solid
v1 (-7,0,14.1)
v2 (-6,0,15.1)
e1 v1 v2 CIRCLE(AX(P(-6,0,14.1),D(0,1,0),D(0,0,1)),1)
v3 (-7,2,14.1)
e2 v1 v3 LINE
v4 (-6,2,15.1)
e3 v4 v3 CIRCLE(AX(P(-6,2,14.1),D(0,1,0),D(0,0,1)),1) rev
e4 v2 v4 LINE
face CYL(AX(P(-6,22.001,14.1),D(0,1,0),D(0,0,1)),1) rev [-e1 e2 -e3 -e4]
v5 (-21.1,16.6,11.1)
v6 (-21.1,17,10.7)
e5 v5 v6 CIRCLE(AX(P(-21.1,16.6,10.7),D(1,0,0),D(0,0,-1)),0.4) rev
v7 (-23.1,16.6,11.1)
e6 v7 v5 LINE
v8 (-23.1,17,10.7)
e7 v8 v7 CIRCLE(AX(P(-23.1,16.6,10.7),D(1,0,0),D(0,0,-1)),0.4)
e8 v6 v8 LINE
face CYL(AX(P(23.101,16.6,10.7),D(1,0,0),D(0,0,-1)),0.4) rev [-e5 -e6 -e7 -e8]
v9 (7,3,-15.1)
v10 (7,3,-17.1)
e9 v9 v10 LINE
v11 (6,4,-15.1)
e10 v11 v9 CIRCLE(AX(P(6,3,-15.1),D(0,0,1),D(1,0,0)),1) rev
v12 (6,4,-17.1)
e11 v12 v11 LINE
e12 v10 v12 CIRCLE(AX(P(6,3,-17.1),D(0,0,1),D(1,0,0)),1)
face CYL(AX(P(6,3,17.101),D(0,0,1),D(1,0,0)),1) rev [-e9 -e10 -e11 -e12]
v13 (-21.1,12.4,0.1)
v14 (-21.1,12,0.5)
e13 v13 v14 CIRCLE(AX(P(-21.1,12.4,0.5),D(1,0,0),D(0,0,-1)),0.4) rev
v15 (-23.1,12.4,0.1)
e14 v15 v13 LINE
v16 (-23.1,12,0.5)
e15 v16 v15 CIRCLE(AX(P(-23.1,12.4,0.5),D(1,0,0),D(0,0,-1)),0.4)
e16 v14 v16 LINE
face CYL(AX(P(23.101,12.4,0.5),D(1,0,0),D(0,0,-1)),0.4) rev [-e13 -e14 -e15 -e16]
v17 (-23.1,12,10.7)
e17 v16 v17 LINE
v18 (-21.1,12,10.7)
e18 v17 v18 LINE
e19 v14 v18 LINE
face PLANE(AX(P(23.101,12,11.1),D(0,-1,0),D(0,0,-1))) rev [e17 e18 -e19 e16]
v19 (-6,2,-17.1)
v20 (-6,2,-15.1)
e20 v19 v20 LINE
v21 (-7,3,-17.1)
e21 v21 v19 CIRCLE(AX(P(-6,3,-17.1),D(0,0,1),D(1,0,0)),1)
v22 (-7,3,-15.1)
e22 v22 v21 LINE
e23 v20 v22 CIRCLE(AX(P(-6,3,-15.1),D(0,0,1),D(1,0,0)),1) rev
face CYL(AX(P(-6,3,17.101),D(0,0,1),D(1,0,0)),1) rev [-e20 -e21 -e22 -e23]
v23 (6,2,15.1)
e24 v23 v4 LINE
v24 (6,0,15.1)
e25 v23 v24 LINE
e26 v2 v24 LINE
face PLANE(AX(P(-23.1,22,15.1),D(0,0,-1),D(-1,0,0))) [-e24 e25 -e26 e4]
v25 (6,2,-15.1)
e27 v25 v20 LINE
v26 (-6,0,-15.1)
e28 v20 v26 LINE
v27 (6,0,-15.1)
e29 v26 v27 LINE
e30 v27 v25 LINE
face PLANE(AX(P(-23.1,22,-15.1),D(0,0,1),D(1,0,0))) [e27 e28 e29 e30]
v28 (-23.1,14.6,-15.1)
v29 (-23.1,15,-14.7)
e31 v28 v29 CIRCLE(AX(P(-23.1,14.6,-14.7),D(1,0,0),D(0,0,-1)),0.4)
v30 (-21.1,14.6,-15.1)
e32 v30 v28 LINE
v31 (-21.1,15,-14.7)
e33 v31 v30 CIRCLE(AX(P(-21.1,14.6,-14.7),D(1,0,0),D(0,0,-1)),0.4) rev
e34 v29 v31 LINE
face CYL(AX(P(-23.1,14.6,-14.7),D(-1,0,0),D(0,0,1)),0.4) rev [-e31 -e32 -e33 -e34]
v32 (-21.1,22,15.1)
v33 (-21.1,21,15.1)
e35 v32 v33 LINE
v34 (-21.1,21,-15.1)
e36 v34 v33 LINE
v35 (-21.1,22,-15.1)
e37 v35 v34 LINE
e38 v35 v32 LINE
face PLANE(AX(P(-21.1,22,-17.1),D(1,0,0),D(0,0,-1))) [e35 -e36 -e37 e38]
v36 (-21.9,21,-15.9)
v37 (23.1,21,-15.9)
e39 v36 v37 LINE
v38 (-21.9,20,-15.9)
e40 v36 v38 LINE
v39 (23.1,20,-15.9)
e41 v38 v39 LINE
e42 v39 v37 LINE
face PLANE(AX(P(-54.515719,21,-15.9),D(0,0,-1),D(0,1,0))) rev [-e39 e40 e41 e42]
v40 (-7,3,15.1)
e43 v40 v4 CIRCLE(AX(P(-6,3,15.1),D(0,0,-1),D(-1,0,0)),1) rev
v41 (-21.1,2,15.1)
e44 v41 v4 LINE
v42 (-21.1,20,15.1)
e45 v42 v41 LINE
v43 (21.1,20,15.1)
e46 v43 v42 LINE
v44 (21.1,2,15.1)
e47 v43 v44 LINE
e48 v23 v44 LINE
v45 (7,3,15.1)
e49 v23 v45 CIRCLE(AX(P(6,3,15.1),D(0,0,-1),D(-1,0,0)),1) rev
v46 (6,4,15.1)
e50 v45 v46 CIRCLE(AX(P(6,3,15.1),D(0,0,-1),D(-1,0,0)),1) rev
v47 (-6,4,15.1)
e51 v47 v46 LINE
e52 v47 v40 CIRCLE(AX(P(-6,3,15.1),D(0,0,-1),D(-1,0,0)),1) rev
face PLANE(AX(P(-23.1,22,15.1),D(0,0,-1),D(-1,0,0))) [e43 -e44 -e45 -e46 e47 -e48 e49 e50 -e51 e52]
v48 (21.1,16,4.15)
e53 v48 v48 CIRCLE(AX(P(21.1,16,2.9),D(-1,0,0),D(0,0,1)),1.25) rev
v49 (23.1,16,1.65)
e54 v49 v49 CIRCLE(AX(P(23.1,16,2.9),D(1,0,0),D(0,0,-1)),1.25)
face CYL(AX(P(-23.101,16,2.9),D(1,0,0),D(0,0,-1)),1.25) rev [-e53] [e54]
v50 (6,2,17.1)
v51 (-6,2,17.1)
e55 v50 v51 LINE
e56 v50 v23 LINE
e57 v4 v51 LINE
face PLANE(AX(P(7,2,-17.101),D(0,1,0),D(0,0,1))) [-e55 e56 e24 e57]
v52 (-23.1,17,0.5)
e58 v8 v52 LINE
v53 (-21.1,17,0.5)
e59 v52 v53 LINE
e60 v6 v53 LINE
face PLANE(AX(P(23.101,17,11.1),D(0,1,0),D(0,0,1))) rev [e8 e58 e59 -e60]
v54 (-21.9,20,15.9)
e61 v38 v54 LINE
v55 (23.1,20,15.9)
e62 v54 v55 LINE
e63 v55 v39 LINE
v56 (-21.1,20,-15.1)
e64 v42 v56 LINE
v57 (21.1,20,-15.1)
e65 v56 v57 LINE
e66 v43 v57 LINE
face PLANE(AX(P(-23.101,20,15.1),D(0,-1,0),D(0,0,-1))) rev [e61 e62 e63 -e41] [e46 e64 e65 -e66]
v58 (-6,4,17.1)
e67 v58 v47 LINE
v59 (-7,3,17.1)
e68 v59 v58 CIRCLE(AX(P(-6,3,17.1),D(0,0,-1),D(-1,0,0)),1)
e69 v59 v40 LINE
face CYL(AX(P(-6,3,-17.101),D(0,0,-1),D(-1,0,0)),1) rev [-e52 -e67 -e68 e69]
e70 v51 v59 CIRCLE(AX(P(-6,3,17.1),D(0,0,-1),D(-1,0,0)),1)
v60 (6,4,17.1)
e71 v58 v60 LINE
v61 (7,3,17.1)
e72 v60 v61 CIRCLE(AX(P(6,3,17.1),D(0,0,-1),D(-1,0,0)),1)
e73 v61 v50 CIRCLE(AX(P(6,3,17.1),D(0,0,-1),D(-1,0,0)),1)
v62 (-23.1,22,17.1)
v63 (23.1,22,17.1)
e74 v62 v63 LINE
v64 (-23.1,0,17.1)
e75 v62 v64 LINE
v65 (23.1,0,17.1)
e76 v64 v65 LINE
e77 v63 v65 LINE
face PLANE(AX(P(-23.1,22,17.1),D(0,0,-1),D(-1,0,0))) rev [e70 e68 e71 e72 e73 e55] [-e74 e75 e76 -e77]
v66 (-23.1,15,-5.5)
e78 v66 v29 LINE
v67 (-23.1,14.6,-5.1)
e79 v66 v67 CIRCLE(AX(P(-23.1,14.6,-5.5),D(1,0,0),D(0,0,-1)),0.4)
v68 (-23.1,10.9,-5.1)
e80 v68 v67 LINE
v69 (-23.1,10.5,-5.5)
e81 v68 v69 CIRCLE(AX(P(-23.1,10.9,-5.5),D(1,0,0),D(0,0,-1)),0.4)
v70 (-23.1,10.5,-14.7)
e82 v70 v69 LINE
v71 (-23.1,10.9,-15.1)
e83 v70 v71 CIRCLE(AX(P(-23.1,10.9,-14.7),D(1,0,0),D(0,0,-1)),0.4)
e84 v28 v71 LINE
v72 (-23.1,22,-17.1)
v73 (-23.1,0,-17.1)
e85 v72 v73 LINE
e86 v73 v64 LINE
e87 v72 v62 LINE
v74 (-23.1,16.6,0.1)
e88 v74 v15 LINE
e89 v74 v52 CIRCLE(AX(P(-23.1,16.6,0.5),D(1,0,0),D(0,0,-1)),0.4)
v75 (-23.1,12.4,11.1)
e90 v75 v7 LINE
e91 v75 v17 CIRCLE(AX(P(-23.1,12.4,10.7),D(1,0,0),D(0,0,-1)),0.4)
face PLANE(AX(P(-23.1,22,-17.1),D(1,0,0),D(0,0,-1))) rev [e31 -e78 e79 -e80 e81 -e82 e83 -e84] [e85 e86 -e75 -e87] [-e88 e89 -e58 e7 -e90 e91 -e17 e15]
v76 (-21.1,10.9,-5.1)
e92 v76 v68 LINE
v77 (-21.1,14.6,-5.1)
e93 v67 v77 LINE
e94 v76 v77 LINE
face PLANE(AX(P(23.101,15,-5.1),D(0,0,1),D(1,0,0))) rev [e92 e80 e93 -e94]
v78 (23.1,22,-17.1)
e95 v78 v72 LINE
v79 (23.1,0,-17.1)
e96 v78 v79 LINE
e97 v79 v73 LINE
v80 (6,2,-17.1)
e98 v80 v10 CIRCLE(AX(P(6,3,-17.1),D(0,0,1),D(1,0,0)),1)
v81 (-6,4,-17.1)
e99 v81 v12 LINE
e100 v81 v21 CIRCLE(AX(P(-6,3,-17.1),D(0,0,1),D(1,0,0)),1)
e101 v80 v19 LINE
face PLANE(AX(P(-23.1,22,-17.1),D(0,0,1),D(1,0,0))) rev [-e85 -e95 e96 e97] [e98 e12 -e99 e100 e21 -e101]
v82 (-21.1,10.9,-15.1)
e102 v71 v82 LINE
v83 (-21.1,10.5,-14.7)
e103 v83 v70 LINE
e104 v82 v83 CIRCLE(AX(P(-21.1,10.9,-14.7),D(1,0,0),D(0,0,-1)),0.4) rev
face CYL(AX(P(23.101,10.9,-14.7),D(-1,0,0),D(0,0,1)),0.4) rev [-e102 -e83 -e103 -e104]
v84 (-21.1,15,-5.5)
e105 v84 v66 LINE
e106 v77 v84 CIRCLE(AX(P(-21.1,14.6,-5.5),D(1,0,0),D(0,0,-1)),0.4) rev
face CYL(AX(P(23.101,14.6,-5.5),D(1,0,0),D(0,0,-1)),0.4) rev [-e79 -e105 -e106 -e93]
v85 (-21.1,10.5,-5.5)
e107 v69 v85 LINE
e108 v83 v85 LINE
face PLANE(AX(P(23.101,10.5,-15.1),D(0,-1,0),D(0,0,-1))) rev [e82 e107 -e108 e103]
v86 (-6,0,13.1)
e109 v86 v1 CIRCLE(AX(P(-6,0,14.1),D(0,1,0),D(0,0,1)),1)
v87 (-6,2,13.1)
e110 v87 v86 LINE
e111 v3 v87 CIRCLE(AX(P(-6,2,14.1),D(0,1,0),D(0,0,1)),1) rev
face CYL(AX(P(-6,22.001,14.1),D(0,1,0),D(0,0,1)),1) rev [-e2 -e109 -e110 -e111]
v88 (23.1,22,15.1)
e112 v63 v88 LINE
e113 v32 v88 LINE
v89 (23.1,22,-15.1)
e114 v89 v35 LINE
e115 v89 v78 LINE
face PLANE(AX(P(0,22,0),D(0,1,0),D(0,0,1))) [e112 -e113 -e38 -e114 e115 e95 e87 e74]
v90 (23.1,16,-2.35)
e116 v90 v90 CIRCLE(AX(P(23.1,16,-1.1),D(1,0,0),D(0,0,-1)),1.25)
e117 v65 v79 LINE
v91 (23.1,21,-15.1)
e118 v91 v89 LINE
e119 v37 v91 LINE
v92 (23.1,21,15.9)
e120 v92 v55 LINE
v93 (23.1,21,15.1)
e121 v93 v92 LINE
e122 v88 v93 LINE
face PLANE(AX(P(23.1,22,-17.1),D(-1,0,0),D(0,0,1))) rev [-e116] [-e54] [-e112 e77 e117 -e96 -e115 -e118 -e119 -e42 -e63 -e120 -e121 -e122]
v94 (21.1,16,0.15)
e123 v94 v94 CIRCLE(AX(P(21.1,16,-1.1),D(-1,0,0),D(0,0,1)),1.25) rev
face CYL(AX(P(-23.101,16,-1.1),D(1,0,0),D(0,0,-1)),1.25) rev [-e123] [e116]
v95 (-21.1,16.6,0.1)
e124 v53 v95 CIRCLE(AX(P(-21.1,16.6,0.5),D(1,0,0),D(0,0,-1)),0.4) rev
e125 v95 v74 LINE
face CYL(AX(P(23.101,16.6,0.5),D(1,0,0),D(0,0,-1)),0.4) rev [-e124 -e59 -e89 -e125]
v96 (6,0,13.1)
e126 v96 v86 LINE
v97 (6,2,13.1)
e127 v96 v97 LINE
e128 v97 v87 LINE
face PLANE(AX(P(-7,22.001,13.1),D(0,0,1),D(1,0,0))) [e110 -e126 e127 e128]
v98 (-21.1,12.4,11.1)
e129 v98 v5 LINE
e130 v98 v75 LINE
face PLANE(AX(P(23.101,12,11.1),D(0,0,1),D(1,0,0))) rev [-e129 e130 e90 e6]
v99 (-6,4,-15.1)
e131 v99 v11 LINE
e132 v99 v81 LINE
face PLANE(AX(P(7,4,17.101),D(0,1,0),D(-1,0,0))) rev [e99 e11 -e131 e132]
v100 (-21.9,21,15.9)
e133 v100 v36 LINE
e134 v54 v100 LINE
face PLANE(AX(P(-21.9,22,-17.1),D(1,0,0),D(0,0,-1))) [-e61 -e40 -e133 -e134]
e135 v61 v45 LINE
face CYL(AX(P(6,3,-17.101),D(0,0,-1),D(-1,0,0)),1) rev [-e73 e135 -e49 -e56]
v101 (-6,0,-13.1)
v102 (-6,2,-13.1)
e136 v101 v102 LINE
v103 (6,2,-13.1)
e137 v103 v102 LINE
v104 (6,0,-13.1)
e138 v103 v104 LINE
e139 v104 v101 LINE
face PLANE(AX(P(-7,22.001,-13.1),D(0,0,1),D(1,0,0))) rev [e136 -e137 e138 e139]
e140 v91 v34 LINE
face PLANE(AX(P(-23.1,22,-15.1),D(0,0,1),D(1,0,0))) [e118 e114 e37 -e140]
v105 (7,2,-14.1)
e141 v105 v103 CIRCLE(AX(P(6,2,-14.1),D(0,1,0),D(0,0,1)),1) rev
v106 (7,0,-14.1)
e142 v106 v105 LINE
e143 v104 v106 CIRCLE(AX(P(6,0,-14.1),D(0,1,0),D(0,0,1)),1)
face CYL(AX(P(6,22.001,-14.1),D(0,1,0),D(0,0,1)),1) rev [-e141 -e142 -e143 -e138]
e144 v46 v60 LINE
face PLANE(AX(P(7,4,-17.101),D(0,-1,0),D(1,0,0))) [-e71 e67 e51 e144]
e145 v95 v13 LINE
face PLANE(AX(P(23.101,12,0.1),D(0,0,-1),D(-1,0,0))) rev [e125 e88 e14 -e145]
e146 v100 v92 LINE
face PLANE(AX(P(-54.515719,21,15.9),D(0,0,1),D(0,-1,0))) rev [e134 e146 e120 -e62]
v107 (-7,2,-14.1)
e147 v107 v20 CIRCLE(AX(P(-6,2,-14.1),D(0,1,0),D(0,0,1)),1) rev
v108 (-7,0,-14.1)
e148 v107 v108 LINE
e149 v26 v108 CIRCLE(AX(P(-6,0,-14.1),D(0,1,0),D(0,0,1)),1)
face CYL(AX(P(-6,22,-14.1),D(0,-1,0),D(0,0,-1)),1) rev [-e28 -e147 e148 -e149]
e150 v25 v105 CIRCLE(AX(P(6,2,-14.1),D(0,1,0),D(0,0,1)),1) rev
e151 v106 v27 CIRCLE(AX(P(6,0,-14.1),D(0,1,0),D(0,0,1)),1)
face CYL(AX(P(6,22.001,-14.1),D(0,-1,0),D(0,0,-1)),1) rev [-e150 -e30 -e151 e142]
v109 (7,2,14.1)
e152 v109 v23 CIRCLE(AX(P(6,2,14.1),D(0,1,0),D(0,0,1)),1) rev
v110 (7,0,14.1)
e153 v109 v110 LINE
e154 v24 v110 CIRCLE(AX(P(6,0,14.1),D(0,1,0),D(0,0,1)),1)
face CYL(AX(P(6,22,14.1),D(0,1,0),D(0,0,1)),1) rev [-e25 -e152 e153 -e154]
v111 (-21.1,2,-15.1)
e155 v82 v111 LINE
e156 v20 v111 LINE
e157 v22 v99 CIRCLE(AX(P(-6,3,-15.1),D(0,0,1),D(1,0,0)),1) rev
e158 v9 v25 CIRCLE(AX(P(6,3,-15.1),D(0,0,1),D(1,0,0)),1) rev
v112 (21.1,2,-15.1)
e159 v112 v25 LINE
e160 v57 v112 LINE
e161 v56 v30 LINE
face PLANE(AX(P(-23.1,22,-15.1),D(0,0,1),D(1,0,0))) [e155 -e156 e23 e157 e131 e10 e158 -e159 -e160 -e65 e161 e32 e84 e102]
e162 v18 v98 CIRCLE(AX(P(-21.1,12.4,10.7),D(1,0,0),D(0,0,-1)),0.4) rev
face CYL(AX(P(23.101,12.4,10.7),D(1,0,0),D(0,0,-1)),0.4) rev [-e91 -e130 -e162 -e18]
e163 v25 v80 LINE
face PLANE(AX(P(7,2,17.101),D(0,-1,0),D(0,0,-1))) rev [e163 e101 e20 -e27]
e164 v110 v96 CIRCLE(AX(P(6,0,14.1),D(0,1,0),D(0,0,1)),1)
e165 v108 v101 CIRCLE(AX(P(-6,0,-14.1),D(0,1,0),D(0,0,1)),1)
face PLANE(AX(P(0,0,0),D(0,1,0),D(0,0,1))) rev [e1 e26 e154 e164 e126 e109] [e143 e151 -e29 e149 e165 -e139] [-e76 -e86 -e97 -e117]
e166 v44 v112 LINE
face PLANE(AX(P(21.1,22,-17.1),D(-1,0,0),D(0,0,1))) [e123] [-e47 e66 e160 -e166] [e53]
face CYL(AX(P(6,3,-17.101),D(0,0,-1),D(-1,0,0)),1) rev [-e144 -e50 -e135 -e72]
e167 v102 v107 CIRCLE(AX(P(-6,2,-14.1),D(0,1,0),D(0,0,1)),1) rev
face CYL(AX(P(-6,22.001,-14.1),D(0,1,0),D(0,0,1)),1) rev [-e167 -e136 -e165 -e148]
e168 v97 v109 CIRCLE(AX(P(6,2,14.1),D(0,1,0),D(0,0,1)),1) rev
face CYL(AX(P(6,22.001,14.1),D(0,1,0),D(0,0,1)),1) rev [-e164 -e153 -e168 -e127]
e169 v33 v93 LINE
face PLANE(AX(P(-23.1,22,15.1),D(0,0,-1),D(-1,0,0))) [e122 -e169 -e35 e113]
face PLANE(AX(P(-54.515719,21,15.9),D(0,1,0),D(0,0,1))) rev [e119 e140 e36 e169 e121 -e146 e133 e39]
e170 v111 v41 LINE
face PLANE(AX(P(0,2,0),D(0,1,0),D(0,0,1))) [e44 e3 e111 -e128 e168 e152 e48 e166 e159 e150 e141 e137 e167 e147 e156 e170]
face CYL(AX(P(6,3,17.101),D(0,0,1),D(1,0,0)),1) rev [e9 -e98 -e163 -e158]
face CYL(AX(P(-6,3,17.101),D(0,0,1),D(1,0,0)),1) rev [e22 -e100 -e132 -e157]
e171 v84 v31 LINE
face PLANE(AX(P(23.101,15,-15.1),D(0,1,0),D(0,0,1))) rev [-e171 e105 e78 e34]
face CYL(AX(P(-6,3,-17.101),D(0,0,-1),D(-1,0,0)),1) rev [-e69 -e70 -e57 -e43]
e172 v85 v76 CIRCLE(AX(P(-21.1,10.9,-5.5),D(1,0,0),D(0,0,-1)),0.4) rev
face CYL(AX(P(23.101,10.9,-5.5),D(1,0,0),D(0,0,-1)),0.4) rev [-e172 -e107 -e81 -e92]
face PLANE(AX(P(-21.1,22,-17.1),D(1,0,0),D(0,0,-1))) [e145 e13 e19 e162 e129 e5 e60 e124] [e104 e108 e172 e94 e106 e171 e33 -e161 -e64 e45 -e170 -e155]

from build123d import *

# Parameters (mm, degrees)
SKETCH_1_W             = 46.2
SKETCH_1_H             = 34.2
EXTRUDE_1_DEPTH        = 22
SHELL_1_T              = -2
CUT_EXTRUDE_3_REACH    = 55.952
SKETCH_4_W             = 30.2
SKETCH_4_H             = 2
SKETCH_5_W             = 31.8
SKETCH_5_H             = 1
CUT_EXTRUDE_4_DEPTH    = 45
CUT_EXTRUDE_6_REACH    = 38.194
SKETCH_8_W             = 14
SKETCH_8_H             = 2
CUT_EXTRUDE_7_REACH    = 48.768
SKETCH_9_W             = 14
SKETCH_9_H             = 2
FILLET_3_R             = 1
FILLET_4_R             = 1
FILLET_3_OF_MIRROR_1_R = 1
FILLET_4_OF_MIRROR_1_R = 1
CUT_EXTRUDE_8_REACH    = 55.952
SKETCH_10_W            = 10
SKETCH_10_H            = 4.5
FILLET_6_R             = 0.4
CUT_EXTRUDE_9_REACH    = 55.952
SKETCH_11_W            = 11
SKETCH_11_H            = 5
FILLET_7_R             = 0.4
CUT_EXTRUDE_10_REACH   = 55.952
SKETCH_12_R            = 1.25


# Some blends are built 0.0001 mm under size
with BuildPart() as part:
    # 草图1 → 凸台-拉伸1 (new body)
    with BuildSketch(Plane(origin=(0, 0, 0), x_dir=(1, 0, 0), z_dir=(0, 1, 0))):
        Rectangle(SKETCH_1_W, SKETCH_1_H)
    extrude(amount=EXTRUDE_1_DEPTH)

    # 抽壳1
    shell_1_openings = [part.faces().sort_by_distance(p)[0] for p in [
        (0, 22, 0),
    ]]
    offset(amount=SHELL_1_T, openings=shell_1_openings, kind=Kind.INTERSECTION)

    # 草图4 → 切除-拉伸3 (cut, up to next)
    with BuildSketch(Plane(origin=(23.1, 0, 0), x_dir=(0, 0, -1), z_dir=(1, 0, 0)), mode=Mode.PRIVATE) as cut_extrude_3_sk1:
        with Locations((0, 21)):
            Rectangle(SKETCH_4_W, SKETCH_4_H)
    cut_extrude_3_tool1 = extrude(cut_extrude_3_sk1.sketch, amount=-CUT_EXTRUDE_3_REACH, mode=Mode.PRIVATE) & part.part
    add(cut_extrude_3_tool1.solids().sort_by_distance((23.1, 21, 0))[0], mode=Mode.SUBTRACT)

    # 草图5 → 切除-拉伸4 (cut)
    with BuildSketch(Plane(origin=(23.1, 0, 0), x_dir=(0, 0, -1), z_dir=(1, 0, 0))):
        with Locations((0, 20.5)):
            Rectangle(SKETCH_5_W, SKETCH_5_H)
    extrude(amount=-CUT_EXTRUDE_4_DEPTH, mode=Mode.SUBTRACT)

    # 草图8 → 切除-拉伸6 (cut, up to next)
    with BuildSketch(Plane.XZ, mode=Mode.PRIVATE) as cut_extrude_6_sk1:
        with Locations((0, -14.1)):
            Rectangle(SKETCH_8_W, SKETCH_8_H)
    cut_extrude_6_tool1 = extrude(cut_extrude_6_sk1.sketch, amount=-CUT_EXTRUDE_6_REACH, mode=Mode.PRIVATE) & part.part
    cut_extrude_6 = cut_extrude_6_tool1.solids().sort_by_distance((0, 0, -14.1))[0]
    add(cut_extrude_6, mode=Mode.SUBTRACT)

    # 草图9 → 切除-拉伸7 (cut, up to next)
    with BuildSketch(Plane(origin=(0, 0, -17.1), x_dir=(-1, 0, 0), z_dir=(0, 0, -1)), mode=Mode.PRIVATE) as cut_extrude_7_sk1:
        with Locations((0, 3)):
            Rectangle(SKETCH_9_W, SKETCH_9_H)
    cut_extrude_7_tool1 = extrude(cut_extrude_7_sk1.sketch, amount=-CUT_EXTRUDE_7_REACH, mode=Mode.PRIVATE) & part.part
    cut_extrude_7 = cut_extrude_7_tool1.solids().sort_by_distance((0, 3, -17.1))[0]
    add(cut_extrude_7, mode=Mode.SUBTRACT)

    # 圆角3
    # the kernel refuses this fillet: 1 mm, written as the material it adds along each edge
    with BuildSketch(Plane(origin=(-7, 4, -17.1), x_dir=(0, -1, 0), z_dir=(0, 0, 1)), Plane(origin=(-7, 2, -17.1), x_dir=(1, 0, 0), z_dir=(0, 0, 1)), Plane(origin=(7, 2, -17.1), x_dir=(0, 1, 0), z_dir=(0, 0, 1))) as fillet_3_piece_1:
        with BuildLine():
            CenterArc((FILLET_3_R, FILLET_3_R), FILLET_3_R, 180, 90)
            Line((0, FILLET_3_R), (0, 0))
            Line((0, 0), (FILLET_3_R, 0))
        make_face()
    extrude(amount=2)
    with BuildSketch(Plane(origin=(7, 4, -17.1), x_dir=(0, -1, 0), z_dir=(0, 0, 1))) as fillet_3_piece_2:
        with BuildLine():
            CenterArc((FILLET_3_R, -FILLET_3_R), FILLET_3_R, 90, 90)
            Line((0, -FILLET_3_R), (0, 0))
            Line((0, 0), (FILLET_3_R, 0))
        make_face()
    extrude(amount=2)

    # 圆角4
    fillet_4_edges = [part.edges().sort_by_distance(p)[0] for p in [
        (-7, 1, -15.1),
        (-7, 1, -13.1),
        (7, 1, -15.1),
        (7, 1, -13.1),
    ]]
    fillet(fillet_4_edges, radius=FILLET_4_R - 0.0001)  # a hair under: the kernel refuses the full size

    # 镜向1: 切除-拉伸6, 切除-拉伸7 across plane
    add(cut_extrude_6.mirror(Plane.XY), mode=Mode.SUBTRACT)
    add(cut_extrude_7.mirror(Plane.XY), mode=Mode.SUBTRACT)

    # 圆角3 of 镜向1
    # the kernel refuses this fillet: 1 mm, written as the material it adds along each edge
    with BuildSketch(Plane(origin=(-7, 4, 17.1), x_dir=(1, 0, 0), z_dir=(0, 0, -1)), Plane(origin=(-7, 2, 17.1), x_dir=(0, 1, 0), z_dir=(0, 0, -1)), Plane(origin=(7, 2, 17.1), x_dir=(-1, 0, 0), z_dir=(0, 0, -1))) as fillet_3_of_mirror_1_piece_1:
        with BuildLine():
            CenterArc((FILLET_3_OF_MIRROR_1_R, FILLET_3_OF_MIRROR_1_R), FILLET_3_OF_MIRROR_1_R, 180, 90)
            Line((0, FILLET_3_OF_MIRROR_1_R), (0, 0))
            Line((0, 0), (FILLET_3_OF_MIRROR_1_R, 0))
        make_face()
    extrude(amount=2)
    with BuildSketch(Plane(origin=(7, 4, 17.1), x_dir=(-1, 0, 0), z_dir=(0, 0, -1))) as fillet_3_of_mirror_1_piece_2:
        with BuildLine():
            CenterArc((FILLET_3_OF_MIRROR_1_R, -FILLET_3_OF_MIRROR_1_R), FILLET_3_OF_MIRROR_1_R, 90, 90)
            Line((0, -FILLET_3_OF_MIRROR_1_R), (0, 0))
            Line((0, 0), (FILLET_3_OF_MIRROR_1_R, 0))
        make_face()
    extrude(amount=2)

    # 圆角4 of 镜向1
    fillet_4_of_mirror_1_edges = [part.edges().sort_by_distance(p)[0] for p in [
        (-7, 1, 15.1),
        (-7, 1, 13.1),
        (7, 1, 15.1),
        (7, 1, 13.1),
    ]]
    fillet(fillet_4_of_mirror_1_edges, radius=FILLET_4_OF_MIRROR_1_R - 0.0001)  # a hair under: the kernel refuses the full size

    # 草图10 → 切除-拉伸8 (cut, up to next)
    with BuildSketch(Plane.ZY.offset(23.1), mode=Mode.PRIVATE) as cut_extrude_8_sk1:
        with Locations((-10.1, 12.75)):
            Rectangle(SKETCH_10_W, SKETCH_10_H)
    cut_extrude_8_tool1 = extrude(cut_extrude_8_sk1.sketch, amount=-CUT_EXTRUDE_8_REACH, mode=Mode.PRIVATE) & part.part
    add(cut_extrude_8_tool1.solids().sort_by_distance((-23.1, 12.75, -10.1))[0], mode=Mode.SUBTRACT)

    # 圆角6
    fillet_6_edges = [part.edges().sort_by_distance(p)[0] for p in [
        (-22.1, 10.5, -5.1),
        (-22.1, 15, -5.1),
        (-22.1, 15, -15.1),
        (-22.1, 10.5, -15.1),
    ]]
    fillet(fillet_6_edges, radius=FILLET_6_R)

    # 草图11 → 切除-拉伸9 (cut, up to next)
    with BuildSketch(Plane.ZY.offset(23.1), mode=Mode.PRIVATE) as cut_extrude_9_sk1:
        with Locations((5.6, 14.5)):
            Rectangle(SKETCH_11_W, SKETCH_11_H)
    cut_extrude_9_tool1 = extrude(cut_extrude_9_sk1.sketch, amount=-CUT_EXTRUDE_9_REACH, mode=Mode.PRIVATE) & part.part
    add(cut_extrude_9_tool1.solids().sort_by_distance((-23.1, 14.5, 5.6))[0], mode=Mode.SUBTRACT)

    # 圆角7
    fillet_7_edges = [part.edges().sort_by_distance(p)[0] for p in [
        (-22.1, 17, 0.1),
        (-22.1, 12, 0.1),
        (-22.1, 12, 11.1),
        (-22.1, 17, 11.1),
    ]]
    fillet(fillet_7_edges, radius=FILLET_7_R)

    # 草图12 → 切除-拉伸10 (cut, up to next)
    with BuildSketch(Plane(origin=(23.1, 0, 0), x_dir=(0, 0, -1), z_dir=(1, 0, 0)), mode=Mode.PRIVATE) as cut_extrude_10_sk1:
        with Locations((-2.9, 16)):
            Circle(SKETCH_12_R)
    cut_extrude_10_tool1 = extrude(cut_extrude_10_sk1.sketch, amount=-CUT_EXTRUDE_10_REACH, mode=Mode.PRIVATE) & part.part
    # 草图12 → 切除-拉伸10 (cut, up to next)
    with BuildSketch(Plane(origin=(23.1, 0, 0), x_dir=(0, 0, -1), z_dir=(1, 0, 0)), mode=Mode.PRIVATE) as cut_extrude_10_sk2:
        with Locations((1.1, 16)):
            Circle(SKETCH_12_R)
    cut_extrude_10_tool2 = extrude(cut_extrude_10_sk2.sketch, amount=-CUT_EXTRUDE_10_REACH, mode=Mode.PRIVATE) & part.part
    add(cut_extrude_10_tool1.solids().sort_by_distance((23.1, 16, 2.9))[0], mode=Mode.SUBTRACT)
    add(cut_extrude_10_tool2.solids().sort_by_distance((23.1, 16, -1.1))[0], mode=Mode.SUBTRACT)


solid = part.part
